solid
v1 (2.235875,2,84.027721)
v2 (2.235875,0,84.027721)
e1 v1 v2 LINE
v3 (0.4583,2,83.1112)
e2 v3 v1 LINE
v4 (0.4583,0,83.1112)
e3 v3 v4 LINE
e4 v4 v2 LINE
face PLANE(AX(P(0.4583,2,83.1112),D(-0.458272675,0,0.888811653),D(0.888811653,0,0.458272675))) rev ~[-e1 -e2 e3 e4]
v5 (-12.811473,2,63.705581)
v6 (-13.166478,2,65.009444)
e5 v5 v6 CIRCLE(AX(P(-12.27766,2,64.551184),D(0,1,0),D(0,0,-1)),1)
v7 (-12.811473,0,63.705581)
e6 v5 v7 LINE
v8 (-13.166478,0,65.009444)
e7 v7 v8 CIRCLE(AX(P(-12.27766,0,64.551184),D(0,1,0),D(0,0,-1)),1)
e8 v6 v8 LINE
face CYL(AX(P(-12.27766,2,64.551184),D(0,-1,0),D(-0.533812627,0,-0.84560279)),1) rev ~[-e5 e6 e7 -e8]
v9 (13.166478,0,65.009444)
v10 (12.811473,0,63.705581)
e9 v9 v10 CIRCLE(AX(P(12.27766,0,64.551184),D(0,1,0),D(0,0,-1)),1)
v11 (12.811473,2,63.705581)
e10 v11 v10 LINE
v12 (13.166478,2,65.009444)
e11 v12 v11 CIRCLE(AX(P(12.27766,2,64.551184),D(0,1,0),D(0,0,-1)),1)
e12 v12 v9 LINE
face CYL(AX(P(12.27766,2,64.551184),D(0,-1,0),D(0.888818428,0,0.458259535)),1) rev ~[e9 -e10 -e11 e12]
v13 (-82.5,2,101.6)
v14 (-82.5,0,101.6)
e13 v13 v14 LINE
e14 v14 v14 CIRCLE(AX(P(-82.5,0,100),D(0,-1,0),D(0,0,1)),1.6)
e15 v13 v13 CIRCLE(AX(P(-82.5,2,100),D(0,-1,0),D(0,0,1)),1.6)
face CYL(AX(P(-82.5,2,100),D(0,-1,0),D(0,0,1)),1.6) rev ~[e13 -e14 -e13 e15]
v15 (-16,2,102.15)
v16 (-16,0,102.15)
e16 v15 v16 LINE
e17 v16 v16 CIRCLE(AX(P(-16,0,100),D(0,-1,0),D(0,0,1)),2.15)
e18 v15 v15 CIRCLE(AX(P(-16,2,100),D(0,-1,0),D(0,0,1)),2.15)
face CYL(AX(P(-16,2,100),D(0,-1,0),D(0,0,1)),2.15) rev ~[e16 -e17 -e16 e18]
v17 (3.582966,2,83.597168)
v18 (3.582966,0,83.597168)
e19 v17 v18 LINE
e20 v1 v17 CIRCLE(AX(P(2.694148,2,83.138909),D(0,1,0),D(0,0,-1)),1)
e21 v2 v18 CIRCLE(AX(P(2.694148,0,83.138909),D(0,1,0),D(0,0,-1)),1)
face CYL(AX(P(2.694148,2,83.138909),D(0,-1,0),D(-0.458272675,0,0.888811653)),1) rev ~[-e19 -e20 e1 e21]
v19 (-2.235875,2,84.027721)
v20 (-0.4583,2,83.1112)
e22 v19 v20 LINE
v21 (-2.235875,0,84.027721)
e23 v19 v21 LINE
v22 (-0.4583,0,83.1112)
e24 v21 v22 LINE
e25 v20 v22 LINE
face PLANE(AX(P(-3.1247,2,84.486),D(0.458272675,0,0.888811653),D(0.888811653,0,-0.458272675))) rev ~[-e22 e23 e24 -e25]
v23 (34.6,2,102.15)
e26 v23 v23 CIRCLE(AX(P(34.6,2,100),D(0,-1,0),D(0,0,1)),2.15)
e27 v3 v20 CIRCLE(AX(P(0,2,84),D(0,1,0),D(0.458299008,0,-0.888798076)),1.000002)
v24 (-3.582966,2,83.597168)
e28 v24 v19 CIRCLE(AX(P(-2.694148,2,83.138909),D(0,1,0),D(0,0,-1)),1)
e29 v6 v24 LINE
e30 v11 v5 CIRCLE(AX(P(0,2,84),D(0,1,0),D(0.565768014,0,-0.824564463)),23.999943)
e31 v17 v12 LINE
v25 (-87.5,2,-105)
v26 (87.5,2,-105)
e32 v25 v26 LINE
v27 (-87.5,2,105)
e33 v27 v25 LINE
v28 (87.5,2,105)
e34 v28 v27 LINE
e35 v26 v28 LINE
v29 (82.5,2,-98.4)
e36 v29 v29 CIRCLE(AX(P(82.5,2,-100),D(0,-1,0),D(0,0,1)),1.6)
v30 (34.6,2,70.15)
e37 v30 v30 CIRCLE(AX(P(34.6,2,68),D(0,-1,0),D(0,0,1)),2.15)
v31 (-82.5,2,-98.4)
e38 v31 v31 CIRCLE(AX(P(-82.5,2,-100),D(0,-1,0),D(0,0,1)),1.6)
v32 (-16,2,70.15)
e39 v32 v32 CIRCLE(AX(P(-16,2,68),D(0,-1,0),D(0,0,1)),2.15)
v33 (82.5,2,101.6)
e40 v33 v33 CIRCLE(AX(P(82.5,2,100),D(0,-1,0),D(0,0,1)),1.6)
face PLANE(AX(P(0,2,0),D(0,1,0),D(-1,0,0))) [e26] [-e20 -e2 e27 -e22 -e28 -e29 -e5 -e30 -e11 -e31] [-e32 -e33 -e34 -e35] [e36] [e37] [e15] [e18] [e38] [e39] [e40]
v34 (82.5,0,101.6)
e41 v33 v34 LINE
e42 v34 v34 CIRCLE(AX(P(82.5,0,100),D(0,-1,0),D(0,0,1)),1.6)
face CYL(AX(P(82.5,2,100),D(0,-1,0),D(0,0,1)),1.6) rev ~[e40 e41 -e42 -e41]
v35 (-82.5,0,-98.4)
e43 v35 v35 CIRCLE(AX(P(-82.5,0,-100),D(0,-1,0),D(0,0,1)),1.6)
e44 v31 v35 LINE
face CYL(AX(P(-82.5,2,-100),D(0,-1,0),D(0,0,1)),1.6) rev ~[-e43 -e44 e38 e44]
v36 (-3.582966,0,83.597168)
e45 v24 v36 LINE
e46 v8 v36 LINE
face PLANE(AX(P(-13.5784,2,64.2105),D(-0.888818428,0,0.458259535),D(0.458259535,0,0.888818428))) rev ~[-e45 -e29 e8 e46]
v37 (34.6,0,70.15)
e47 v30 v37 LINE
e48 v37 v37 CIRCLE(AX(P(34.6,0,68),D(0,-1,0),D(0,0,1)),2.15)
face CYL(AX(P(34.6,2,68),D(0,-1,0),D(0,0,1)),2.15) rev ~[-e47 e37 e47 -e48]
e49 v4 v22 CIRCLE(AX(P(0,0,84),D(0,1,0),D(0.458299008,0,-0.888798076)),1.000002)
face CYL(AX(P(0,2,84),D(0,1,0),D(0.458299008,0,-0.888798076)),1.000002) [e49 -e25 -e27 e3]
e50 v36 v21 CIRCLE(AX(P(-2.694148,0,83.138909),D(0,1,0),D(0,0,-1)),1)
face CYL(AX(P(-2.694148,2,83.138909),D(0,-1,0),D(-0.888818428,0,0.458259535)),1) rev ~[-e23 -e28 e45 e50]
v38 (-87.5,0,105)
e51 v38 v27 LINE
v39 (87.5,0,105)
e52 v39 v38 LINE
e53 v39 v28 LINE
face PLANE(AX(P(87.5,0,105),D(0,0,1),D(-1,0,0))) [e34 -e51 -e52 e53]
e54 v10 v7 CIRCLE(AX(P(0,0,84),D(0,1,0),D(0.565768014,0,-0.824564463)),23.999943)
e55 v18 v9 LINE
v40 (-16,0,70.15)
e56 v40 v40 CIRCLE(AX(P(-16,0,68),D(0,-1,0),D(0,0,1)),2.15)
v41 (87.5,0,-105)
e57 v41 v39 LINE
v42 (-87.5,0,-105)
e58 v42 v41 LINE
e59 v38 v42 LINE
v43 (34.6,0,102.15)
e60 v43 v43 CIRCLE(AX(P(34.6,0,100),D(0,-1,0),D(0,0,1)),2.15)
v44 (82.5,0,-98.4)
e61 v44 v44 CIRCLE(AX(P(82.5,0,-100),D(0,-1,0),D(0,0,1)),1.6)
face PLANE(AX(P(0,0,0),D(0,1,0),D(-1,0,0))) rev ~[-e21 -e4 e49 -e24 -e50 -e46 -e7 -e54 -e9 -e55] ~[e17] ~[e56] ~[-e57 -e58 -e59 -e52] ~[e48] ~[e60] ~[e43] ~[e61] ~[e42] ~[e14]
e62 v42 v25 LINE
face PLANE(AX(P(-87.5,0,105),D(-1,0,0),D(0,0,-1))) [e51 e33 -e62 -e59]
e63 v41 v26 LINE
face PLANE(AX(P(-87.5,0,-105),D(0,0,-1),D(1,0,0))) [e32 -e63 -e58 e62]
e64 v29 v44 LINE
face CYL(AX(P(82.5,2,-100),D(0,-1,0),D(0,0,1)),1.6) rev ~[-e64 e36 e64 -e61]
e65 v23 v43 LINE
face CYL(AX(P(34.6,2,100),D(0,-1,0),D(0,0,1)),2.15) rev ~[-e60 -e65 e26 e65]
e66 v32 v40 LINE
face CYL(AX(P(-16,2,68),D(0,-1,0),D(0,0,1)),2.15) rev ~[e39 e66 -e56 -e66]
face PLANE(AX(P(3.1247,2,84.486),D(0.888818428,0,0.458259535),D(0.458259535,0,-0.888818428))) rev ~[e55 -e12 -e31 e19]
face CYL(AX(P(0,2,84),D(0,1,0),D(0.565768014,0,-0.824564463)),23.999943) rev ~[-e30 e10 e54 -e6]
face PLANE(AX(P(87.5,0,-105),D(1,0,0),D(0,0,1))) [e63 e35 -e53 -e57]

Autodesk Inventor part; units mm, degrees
ref_plane "YZ Plane" through (0, 0, 0) normal (1, 0, 0) x (0, 1, 0)
ref_plane "XZ Plane" through (0, 0, 0) normal (0, 1, 0) x (-1, 0, 0)
ref_plane "XY Plane" through (0, 0, 0) normal (0, 0, 1) x (1, 0, 0)
sketch "スケッチ1" plane through (0, 0, 0) normal (0, 1, 0) x (-1, 0, 0)
  line L0 (-87.5, 105) -> (87.5, 105)
  line L1 (87.5, 105) -> (87.5, -105)
  line L2 (87.5, -105) -> (-87.5, -105)
  line L3 (-87.5, -105) -> (-87.5, 105)
  line L4 (-87.5, 105) -> (87.5, -105) construction
  line L5 (87.5, 105) -> (-87.5, -105) construction
  point P0 (0, 0)
  dimension "d0" = 210
  dimension "d1" = 175
extrude "プレート1" add sketch "スケッチ1" along normal blind 2
sketch "スケッチ5" plane through (0, 2, 0) normal (0, 1, 0) x (1, 0, 0)
  line L0 (-16, -100) -> (34.6, -100)
  line L1 (34.6, -100) -> (34.6, -68)
  line L2 (34.6, -68) -> (-16, -68)
  line L3 (-16, -68) -> (-16, -100)
  line L4 (-16, -100) -> (34.6, -68) construction
  line L5 (34.6, -100) -> (-16, -68) construction
  line L6 (87.5, -105) -> (-87.5, -105) projected
  point P0 (0, 0)
  point P1 (0, -84)
  point P2 (9.3, -84)
  point P3 (9.3, -84)
  dimension "d31" = 50.6
  dimension "d32" = 16
  dimension "d33" = 32
  dimension "d34" = 21
hole "穴3" at (34.6, 2, 68) at (34.6, 2, 100) at (-16, 2, 68) at (-16, 2, 100) direction (0, -1, 0) diameter 4.3 end through all clearance for "Socket Head Cap Screw" size "M4" standard "Ansi Metric M Profile"
sketch "スケッチ6" plane through (0, 2, 0) normal (0, 1, 0) x (1, 0, 0)
  line L0 (-87.5, -251.5284) -> (85.7224, 84.4449)
  line L1 (85.7224, 84.4449) -> (87.5, 83.5284)
  line L2 (87.5, 83.5284) -> (-85.7224, -252.4449)
  line L3 (-85.7224, -252.4449) -> (-87.5, -251.5284)
  line L4 (-87.5, -251.5284) -> (87.5, 83.5284) construction
  line L5 (85.7224, 84.4449) -> (-85.7224, -252.4449) construction
  line L6 (87.5, -251.5284) -> (-85.7224, 84.4449)
  line L7 (-85.7224, 84.4449) -> (-87.5, 83.5284)
  line L8 (-87.5, 83.5284) -> (85.7224, -252.4449)
  line L9 (85.7224, -252.4449) -> (87.5, -251.5284)
  line L10 (87.5, -251.5284) -> (-87.5, 83.5284) construction
  line L11 (-85.7224, 84.4449) -> (85.7224, -252.4449) construction
  line L12 (-2.2636, -81.7918) -> (-0.486, -80.8753)
  circle A0 centre (0, -84) radius 22
  line L13 (2.2636, -81.7918) -> (0.486, -80.8753)
  circle A1 centre (0, -84) radius 3
  line L14 (-87.5, -105) -> (-87.5, 105) projected
  line L15 (87.5, 105) -> (87.5, -105) projected
  point P0 (0, 0)
  point P1 (0, -84)
  point P2 (-1.3748, -81.3335)
  point P3 (1.3748, -81.3335)
  point P4 (10.9601, -64.9245)
  point P5 (-10.9601, -64.9245)
  dimension "d54" = 2
  dimension "d55" = 2
  dimension "d57" = 44
  dimension "d59" = 3
  dimension "d60" = 3
  dimension "d65" = 186
  dimension "d66" = 186
extrude "押し出し2" cut sketch "スケッチ6" against normal blind 10 contours A0 L6 L12 L8 | A0 L0 A1 L6 | L12 L6 A1 | A0 L2 L13 L0 | L0 L13 A1
sketch "スケッチ7" plane through (0, 2, 0) normal (0, 1, 0) x (1, 0, 0)
  line L0 (-82.5, -100) -> (82.5, -100)
  line L1 (82.5, -100) -> (82.5, 100)
  line L2 (82.5, 100) -> (-82.5, 100)
  line L3 (-82.5, 100) -> (-82.5, -100)
  line L4 (-82.5, -100) -> (82.5, 100) construction
  line L5 (82.5, -100) -> (-82.5, 100) construction
  line L6 (-87.5, -105) -> (-87.5, 105) projected
  line L7 (87.5, -105) -> (-87.5, -105) projected
  point P0 (0, 0)
  dimension "d45" = 5
  dimension "d46" = 5
hole "穴4" at (-82.5, 2, -100) at (82.5, 2, -100) at (-82.5, 2, 100) at (82.5, 2, 100) direction (0, -1, 0) diameter 3.2 end through all clearance for "Socket Head Cap Screw" size "M3" standard "Ansi Metric M Profile"
sketch "スケッチ8" plane through (0, 2, 0) normal (0, 1, 0) x (1, 0, 0)
  line L0 (10.9601, -64.9245) -> (2.2636, -81.7918) projected
  line L1 (-1.3748, -81.3335) -> (-2.2636, -81.7918) projected
  arc A0 (1.3748, -81.3335) -> (-1.3748, -81.3335) centre (0, -84) ccw projected
  line L2 (2.2636, -81.7918) -> (1.3748, -81.3335) projected
  line L3 (-2.2636, -81.7918) -> (-10.9601, -64.9245) projected
  arc A1 (10.9601, -64.9245) -> (-10.9601, -64.9245) centre (0, -84) ccw projected
  line L4 (3.1247, -84.486) -> (13.5784, -64.2105)
  arc A2 (13.5784, -64.2105) -> (-13.5784, -64.2105) centre (0, -84) ccw
  line L5 (-13.5784, -64.2105) -> (-3.1247, -84.486)
  line L6 (-3.1247, -84.486) -> (-0.4583, -83.1112)
  arc A3 (0.4583, -83.1112) -> (-0.4583, -83.1112) centre (0, -84) ccw
  line L7 (0.4583, -83.1112) -> (3.1247, -84.486)
  point P0 (0, 0)
  dimension "d61" = 2
extrude "押し出し3" cut sketch "スケッチ8" against normal blind 10 contours L0 L2 A0 L1 L3 A1 | L7 A3 L6 L5 A2 L4
fillet "コーナーR1" radius 1 4 edges at (-3.1247, 1, 84.486) (3.1247, 1, 84.486) (-13.5784, 1, 64.2105) (13.5784, 1, 64.2105)
equation "\"d40\" = Thickness"
equation "\"d60\" = d59"
equation "\"d66\" = d65"
equation "\"d2\" = Thickness"
equation "\"BendRadius\" = Thickness"
equation "\"BendReliefWidth\" = Thickness"
equation "\"BendReliefDepth\" = 0.5 * Thickness"
equation "\"CornerReliefSize\" = 4 * Thickness"
equation "\"MinimumRemnant\" = 2 * Thickness"
equation "\"TransitionRadius\" = BendRadius"
equation "\"JacobiRadiusSize\" = BendRadius"
equation "\"GapSize\" = Thickness"
equation "\"Thickness\" = 2"
properties part number "s_carbon_plate1" material "ABS プラスチック"
